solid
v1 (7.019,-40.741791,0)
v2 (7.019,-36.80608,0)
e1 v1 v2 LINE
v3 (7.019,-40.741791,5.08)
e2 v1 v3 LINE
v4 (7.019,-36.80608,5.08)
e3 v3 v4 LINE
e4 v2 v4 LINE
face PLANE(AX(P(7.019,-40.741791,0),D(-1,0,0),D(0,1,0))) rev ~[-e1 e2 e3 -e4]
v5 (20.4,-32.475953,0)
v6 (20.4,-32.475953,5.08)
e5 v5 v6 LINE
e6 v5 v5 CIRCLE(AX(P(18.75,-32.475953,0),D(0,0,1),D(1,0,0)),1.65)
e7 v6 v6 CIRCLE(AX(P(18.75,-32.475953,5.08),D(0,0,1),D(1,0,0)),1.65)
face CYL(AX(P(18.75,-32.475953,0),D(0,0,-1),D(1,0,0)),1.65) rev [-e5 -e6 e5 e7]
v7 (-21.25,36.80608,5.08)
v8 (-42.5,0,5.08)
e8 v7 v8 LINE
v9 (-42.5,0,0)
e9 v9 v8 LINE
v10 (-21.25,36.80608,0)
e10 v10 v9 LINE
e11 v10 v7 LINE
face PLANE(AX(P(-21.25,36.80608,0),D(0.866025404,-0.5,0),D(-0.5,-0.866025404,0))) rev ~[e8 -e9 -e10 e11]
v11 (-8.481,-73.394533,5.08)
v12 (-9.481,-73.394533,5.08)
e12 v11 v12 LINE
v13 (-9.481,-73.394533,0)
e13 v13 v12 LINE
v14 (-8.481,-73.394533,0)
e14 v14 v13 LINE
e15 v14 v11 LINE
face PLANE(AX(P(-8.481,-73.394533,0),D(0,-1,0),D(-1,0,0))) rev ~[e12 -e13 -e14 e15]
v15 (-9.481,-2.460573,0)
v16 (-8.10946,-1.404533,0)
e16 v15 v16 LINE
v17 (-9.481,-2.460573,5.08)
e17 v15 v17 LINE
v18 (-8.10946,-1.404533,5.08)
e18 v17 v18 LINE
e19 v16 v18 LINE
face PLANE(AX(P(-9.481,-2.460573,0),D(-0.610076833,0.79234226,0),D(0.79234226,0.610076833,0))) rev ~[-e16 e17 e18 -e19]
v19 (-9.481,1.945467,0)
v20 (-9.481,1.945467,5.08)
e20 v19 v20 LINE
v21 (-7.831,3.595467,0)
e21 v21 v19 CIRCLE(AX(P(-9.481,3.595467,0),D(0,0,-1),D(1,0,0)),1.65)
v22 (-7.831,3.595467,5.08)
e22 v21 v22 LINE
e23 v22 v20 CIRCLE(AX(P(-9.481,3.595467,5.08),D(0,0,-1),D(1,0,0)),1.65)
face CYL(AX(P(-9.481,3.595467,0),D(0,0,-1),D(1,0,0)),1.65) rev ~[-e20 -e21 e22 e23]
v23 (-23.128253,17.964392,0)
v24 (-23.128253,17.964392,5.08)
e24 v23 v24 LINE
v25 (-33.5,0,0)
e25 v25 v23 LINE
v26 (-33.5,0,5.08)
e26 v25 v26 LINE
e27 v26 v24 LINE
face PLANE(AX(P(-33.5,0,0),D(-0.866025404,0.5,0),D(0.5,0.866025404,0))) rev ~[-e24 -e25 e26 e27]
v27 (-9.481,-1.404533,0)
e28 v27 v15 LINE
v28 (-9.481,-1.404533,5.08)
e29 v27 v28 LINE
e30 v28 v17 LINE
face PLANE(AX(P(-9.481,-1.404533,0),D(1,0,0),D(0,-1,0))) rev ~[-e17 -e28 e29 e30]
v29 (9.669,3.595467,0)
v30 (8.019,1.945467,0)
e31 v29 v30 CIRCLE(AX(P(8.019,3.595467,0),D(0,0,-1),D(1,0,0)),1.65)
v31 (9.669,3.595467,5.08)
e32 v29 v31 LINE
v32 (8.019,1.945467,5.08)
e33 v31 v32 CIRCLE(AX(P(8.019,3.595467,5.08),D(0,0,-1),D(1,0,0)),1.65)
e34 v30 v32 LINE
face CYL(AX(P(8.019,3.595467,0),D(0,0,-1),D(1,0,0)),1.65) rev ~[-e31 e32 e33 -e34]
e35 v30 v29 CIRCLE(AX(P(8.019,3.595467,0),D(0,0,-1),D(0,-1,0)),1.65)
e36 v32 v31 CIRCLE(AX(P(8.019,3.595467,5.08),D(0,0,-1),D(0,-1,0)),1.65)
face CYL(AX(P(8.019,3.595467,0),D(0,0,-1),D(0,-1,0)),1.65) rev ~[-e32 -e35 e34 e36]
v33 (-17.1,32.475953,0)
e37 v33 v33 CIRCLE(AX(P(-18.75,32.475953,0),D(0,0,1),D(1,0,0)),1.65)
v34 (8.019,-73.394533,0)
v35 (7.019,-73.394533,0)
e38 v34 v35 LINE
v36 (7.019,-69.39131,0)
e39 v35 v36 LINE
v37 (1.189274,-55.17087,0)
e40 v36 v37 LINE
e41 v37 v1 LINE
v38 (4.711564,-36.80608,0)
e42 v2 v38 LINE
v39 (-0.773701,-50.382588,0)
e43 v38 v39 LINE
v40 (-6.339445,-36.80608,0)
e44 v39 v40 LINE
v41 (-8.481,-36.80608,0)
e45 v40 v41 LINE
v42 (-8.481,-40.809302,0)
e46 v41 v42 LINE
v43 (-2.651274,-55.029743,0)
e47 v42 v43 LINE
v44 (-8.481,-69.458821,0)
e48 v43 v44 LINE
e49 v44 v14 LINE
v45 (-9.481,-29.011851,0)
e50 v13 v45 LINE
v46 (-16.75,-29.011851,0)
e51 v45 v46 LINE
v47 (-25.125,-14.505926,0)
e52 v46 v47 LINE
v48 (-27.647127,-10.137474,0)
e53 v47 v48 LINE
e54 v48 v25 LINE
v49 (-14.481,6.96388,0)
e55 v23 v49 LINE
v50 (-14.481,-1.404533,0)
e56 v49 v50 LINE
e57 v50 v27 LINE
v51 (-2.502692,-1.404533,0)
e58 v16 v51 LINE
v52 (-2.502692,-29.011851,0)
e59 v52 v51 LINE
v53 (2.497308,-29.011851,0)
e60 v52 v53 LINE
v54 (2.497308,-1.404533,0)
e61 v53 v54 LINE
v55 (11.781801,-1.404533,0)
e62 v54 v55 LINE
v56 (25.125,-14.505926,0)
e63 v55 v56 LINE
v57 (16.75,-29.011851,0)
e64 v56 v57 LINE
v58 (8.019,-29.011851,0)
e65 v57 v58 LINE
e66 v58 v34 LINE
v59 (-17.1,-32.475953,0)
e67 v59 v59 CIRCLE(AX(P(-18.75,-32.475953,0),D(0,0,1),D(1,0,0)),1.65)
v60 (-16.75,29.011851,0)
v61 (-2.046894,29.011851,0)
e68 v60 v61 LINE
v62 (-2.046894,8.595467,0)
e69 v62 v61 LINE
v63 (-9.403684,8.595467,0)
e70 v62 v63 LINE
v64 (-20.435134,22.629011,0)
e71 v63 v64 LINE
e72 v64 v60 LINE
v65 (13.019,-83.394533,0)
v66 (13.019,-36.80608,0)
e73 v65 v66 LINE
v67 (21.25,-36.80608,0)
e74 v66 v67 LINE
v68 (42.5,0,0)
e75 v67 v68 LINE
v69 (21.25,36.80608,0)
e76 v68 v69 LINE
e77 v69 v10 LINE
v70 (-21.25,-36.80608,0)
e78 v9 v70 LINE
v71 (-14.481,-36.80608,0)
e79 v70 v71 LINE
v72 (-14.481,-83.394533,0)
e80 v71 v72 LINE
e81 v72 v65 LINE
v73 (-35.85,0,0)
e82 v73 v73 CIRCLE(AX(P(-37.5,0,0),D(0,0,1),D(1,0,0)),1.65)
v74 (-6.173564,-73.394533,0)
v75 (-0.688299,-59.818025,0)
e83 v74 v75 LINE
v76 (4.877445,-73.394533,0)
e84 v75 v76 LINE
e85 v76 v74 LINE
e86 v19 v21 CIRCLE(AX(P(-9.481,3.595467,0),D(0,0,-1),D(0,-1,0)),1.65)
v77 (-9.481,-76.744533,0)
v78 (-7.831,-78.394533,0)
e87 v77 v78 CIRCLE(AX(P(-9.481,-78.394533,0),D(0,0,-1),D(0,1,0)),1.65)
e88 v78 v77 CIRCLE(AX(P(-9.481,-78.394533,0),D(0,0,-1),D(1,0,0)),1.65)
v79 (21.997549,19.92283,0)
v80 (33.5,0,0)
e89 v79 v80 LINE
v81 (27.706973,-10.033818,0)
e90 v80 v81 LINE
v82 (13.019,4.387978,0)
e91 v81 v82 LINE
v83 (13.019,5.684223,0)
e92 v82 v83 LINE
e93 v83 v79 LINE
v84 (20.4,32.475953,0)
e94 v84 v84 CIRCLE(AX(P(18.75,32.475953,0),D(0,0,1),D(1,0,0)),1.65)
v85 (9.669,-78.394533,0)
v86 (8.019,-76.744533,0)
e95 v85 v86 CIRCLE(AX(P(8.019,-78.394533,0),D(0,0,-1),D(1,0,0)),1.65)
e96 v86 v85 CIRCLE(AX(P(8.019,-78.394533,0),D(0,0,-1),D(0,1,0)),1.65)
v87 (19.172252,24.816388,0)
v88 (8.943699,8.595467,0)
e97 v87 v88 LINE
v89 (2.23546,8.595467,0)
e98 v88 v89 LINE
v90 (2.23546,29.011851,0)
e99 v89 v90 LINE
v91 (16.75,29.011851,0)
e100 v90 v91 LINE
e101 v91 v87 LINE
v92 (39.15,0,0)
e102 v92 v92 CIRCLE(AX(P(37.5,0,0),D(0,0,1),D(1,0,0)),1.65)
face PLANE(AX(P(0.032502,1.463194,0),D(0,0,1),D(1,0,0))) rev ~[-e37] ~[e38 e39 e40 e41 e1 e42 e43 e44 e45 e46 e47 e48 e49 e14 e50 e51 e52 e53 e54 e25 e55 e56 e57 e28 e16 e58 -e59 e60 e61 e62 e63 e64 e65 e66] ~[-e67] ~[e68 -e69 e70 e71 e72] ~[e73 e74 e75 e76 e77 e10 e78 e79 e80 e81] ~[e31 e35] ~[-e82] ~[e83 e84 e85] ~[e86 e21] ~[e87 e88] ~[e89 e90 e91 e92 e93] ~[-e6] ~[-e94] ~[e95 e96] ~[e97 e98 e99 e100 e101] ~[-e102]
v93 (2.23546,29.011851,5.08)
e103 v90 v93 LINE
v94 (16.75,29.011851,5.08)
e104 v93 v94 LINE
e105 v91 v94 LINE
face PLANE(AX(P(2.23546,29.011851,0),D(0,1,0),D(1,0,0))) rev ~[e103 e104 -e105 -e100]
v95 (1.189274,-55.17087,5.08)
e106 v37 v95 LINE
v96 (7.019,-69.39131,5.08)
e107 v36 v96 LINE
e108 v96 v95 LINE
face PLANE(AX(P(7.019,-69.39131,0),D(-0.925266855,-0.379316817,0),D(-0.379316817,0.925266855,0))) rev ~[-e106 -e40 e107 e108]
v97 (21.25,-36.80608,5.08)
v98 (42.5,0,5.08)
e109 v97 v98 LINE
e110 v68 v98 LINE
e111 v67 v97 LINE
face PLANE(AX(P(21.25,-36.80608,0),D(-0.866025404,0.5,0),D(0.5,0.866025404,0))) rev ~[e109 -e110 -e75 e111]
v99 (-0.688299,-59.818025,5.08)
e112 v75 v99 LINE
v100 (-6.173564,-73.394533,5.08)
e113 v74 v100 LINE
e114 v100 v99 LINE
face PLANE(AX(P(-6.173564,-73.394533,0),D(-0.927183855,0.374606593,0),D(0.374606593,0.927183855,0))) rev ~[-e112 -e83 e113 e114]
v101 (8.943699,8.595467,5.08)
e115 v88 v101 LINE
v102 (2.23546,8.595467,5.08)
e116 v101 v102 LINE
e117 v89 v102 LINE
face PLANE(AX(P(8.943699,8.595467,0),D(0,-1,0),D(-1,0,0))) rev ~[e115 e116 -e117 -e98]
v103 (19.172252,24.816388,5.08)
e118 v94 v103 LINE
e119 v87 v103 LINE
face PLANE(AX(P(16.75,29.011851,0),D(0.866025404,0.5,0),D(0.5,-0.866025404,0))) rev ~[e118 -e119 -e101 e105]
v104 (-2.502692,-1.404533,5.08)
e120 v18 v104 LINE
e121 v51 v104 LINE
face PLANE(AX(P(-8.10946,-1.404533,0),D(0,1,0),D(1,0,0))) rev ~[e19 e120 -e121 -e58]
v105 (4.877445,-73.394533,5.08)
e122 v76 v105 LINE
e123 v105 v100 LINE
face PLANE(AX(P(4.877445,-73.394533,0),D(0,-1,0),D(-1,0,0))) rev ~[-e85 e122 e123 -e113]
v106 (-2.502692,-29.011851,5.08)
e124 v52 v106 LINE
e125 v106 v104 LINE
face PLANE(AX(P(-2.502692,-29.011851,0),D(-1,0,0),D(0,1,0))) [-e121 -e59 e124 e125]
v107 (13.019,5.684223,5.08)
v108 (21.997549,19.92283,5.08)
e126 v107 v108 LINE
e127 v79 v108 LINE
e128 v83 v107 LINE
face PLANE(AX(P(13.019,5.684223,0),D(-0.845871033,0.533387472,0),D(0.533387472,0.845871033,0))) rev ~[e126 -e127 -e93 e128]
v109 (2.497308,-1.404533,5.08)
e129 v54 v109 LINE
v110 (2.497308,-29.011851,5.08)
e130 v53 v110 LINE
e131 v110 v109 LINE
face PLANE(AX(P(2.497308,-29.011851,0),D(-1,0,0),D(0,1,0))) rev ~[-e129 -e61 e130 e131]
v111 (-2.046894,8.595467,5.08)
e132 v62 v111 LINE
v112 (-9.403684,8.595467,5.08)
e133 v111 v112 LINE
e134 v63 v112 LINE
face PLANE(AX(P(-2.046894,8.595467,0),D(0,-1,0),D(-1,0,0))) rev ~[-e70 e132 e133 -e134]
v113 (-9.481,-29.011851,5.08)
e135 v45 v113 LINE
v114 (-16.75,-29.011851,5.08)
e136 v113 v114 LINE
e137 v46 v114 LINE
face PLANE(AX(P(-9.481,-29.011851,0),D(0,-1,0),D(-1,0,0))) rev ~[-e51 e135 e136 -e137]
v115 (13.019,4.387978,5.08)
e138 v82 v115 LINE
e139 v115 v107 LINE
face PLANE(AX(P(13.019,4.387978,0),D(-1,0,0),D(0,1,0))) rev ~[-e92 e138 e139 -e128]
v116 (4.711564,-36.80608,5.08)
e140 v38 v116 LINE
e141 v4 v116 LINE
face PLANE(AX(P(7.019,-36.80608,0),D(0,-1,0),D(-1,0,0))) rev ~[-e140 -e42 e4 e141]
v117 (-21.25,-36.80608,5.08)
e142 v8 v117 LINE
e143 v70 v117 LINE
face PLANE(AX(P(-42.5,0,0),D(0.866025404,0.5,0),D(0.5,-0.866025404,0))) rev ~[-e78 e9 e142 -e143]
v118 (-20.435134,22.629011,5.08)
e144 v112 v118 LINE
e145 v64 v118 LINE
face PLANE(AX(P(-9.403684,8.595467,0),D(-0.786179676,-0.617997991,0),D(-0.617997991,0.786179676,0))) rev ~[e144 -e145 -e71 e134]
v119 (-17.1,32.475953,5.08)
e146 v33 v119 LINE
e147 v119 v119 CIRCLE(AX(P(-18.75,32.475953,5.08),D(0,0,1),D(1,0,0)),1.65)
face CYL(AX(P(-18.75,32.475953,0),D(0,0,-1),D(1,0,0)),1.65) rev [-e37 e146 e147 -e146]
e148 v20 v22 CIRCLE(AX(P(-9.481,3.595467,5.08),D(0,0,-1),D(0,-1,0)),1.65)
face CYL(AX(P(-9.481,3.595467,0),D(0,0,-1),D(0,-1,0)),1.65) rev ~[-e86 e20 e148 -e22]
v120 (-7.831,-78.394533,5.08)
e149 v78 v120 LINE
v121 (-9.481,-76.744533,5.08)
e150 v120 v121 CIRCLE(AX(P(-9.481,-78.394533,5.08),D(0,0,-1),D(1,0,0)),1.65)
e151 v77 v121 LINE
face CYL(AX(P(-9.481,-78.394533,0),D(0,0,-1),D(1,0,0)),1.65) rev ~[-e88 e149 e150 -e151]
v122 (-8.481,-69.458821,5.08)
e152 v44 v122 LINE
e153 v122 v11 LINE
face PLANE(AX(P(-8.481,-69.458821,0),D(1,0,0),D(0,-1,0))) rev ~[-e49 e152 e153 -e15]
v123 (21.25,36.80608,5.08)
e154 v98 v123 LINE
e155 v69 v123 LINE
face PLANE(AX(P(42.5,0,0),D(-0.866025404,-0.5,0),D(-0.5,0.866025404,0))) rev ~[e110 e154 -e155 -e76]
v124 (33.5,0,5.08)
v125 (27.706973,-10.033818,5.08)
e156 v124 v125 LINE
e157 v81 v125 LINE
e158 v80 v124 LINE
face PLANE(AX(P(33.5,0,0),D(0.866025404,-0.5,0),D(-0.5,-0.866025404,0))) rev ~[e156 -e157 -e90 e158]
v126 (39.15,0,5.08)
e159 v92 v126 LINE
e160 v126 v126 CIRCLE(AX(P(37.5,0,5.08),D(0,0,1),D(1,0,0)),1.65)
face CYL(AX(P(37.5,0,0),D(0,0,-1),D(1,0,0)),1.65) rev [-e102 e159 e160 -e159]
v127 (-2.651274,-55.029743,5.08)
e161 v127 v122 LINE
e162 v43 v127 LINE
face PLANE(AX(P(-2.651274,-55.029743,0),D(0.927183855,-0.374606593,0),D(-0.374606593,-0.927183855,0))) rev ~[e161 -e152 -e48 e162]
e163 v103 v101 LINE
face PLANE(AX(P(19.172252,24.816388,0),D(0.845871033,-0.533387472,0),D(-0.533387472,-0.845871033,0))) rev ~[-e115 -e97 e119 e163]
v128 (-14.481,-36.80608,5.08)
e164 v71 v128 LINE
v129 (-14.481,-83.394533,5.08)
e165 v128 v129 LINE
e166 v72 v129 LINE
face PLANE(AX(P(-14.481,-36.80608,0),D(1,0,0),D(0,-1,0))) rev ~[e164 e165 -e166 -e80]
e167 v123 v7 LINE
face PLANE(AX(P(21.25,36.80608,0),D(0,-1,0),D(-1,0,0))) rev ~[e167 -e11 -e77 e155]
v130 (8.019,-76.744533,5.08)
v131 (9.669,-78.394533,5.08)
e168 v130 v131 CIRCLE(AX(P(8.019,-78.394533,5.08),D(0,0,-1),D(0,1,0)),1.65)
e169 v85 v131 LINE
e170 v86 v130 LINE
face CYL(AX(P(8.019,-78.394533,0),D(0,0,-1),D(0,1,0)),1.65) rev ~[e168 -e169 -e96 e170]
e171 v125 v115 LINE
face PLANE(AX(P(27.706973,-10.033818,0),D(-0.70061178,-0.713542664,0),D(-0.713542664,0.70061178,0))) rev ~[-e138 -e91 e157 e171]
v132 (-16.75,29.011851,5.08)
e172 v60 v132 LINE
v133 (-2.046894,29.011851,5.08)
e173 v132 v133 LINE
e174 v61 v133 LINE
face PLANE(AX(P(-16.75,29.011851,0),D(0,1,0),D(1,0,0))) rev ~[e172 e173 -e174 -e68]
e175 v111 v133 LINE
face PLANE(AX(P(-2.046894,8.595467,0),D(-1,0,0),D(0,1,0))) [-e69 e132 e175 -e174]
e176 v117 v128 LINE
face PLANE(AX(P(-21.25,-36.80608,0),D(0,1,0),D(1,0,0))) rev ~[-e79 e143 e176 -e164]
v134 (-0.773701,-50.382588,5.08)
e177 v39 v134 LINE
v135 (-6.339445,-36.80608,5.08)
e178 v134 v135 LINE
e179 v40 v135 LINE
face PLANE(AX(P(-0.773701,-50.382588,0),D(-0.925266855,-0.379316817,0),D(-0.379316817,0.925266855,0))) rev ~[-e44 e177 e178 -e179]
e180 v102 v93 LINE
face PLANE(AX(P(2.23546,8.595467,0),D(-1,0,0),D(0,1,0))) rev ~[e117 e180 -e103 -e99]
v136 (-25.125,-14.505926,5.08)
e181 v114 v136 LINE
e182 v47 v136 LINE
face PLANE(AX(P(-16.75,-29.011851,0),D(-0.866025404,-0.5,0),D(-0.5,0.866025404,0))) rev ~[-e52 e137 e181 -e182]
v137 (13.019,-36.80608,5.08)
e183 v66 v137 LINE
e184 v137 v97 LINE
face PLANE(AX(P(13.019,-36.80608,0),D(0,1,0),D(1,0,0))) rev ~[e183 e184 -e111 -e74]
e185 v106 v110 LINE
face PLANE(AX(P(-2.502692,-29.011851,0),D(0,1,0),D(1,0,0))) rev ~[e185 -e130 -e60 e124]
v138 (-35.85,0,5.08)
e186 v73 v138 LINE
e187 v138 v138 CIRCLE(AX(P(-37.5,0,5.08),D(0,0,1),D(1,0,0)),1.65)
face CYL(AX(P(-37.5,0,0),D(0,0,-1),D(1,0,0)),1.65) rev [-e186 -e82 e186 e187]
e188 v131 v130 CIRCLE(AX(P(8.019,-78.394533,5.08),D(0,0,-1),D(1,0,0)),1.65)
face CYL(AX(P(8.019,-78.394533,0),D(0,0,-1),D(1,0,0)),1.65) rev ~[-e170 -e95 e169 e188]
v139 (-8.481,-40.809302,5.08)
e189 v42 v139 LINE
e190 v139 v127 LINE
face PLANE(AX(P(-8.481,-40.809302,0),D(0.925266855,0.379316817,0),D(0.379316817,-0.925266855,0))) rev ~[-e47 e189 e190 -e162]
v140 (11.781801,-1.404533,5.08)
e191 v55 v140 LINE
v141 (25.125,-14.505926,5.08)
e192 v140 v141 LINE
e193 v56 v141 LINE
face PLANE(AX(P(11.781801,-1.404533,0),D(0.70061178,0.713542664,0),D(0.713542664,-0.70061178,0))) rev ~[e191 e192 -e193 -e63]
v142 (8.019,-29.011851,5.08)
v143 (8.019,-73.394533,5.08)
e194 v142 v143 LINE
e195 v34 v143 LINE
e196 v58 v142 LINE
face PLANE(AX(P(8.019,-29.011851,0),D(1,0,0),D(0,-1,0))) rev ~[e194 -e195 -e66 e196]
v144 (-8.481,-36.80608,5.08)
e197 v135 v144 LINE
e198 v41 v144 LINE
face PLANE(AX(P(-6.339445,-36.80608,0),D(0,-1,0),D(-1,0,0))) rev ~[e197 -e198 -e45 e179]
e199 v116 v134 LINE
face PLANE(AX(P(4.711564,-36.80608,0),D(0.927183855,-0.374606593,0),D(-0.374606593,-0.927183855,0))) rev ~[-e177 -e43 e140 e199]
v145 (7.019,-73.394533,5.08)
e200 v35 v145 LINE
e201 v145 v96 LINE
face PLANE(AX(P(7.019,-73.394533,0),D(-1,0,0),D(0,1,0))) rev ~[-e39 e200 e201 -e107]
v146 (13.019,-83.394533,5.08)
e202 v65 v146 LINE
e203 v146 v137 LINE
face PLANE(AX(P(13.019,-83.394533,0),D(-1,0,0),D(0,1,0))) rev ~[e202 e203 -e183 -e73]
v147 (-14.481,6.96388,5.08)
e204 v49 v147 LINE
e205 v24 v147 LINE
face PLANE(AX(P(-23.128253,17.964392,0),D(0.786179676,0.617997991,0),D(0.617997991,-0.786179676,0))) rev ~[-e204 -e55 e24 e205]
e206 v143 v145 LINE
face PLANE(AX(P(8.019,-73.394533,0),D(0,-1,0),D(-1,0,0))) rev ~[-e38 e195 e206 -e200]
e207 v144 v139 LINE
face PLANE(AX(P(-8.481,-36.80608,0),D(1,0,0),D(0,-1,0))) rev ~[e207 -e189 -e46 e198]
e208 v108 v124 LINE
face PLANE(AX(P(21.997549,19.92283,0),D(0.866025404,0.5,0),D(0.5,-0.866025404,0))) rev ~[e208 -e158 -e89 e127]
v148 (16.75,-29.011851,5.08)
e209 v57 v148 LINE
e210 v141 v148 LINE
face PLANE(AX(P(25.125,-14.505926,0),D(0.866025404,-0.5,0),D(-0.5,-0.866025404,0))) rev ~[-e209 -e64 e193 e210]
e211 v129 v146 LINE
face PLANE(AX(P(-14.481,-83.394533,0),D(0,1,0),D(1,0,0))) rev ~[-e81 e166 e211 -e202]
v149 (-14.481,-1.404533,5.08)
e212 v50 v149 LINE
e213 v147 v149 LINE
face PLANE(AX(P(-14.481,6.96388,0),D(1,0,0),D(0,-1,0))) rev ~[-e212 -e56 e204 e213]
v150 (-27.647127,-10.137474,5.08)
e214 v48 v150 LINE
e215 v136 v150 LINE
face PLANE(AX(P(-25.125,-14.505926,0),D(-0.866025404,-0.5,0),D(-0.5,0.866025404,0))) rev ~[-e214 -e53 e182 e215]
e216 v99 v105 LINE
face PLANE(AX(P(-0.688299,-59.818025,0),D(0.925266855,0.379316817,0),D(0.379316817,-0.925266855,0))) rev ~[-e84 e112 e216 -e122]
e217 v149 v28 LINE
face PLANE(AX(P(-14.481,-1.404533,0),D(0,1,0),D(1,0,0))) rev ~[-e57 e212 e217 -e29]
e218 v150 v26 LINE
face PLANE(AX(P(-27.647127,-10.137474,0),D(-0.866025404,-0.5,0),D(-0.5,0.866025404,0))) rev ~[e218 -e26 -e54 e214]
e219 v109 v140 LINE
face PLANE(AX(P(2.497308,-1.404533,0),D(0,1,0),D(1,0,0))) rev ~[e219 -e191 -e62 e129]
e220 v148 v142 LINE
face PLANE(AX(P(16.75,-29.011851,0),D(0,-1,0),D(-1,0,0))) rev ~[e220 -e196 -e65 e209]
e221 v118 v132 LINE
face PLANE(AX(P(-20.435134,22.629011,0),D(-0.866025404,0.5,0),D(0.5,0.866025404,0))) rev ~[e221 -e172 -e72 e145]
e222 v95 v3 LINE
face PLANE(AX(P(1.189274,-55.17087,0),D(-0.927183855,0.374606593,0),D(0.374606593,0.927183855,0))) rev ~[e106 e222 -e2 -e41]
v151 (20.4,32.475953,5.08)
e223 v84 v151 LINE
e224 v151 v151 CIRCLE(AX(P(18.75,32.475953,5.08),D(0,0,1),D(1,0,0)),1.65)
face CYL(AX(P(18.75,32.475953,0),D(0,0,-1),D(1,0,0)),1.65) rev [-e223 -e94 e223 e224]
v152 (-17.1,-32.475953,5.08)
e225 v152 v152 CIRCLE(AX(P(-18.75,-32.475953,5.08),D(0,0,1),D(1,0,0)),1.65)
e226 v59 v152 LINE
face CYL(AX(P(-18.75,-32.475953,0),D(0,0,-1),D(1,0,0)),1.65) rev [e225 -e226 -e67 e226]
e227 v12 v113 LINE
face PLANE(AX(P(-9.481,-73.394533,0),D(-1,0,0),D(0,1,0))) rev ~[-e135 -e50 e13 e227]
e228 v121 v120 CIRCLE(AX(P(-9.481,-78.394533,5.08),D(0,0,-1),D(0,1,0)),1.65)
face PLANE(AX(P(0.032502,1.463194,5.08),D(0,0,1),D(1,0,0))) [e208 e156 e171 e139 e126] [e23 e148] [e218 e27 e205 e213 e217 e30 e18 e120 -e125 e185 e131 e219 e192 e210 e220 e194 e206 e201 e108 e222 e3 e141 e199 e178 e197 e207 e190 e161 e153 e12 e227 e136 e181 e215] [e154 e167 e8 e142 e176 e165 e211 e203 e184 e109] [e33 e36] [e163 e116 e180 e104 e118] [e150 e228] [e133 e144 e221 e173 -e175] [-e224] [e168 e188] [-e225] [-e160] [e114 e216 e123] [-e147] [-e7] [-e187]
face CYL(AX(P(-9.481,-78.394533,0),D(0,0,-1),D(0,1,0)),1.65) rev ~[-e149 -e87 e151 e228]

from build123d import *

# Parameters (mm, degrees)
F0_R     = 1.65
F0_W     = 5
F0_H     = 36.5884533238
F0_H_2   = 27.6073180421
F0_W_2   = 4.2823543772
F0_H_3   = 20.4163840114
F1_DEPTH = 5.08


# Not quite as in the source:
# - a feature names something its author has since deleted; it is built from what else it names


with BuildPart() as f1:
    # F0 (on Top) → F1 (new body)
    with BuildSketch(Plane.XY):
        Polygon((21.25, 36.8060796608), (-21.25, 36.8060796608), (-42.5, 0), (-21.25, -36.8060796608), (-14.481, -36.8060796608), (-9.481, -36.8060796608), (-9.481, -29.0118510268), (-16.75, -29.0118510268), (-25.125, -14.5059255134), (-27.6471267629, -10.137473817), (-33.5, 0), (-23.128253194, 17.9643924312), (-20.4351344929, 22.6290108523), (-16.75, 29.0118510268), (-2.0468940441, 29.0118510268), (2.2354603331, 29.0118510268), (16.75, 29.0118510268), (19.1722516141, 24.8163881624), (21.9975489559, 19.92282962), (33.5, 0), (27.7069725582, -10.0338178588), (25.125, -14.5059255134), (16.75, -29.0118510268), (8.019, -29.0118510268), (8.019, -36.8060796608), (13.019, -36.8060796608), (21.25, -36.8060796608), (42.5, 0), align=None)
        with Locations((-18.75, -32.4759526419)):
            Circle(F0_R, mode=Mode.SUBTRACT)
        with Locations((18.75, -32.4759526419)):
            Circle(F0_R, mode=Mode.SUBTRACT)
        with Locations((-37.5, 0)):
            Circle(F0_R, mode=Mode.SUBTRACT)
        with Locations((-18.75, 32.4759526419)):
            Circle(F0_R, mode=Mode.SUBTRACT)
        with Locations((37.5, 0)):
            Circle(F0_R, mode=Mode.SUBTRACT)
        with Locations((18.75, 32.4759526419)):
            Circle(F0_R, mode=Mode.SUBTRACT)
        with Locations((-11.981, -55.1003063227)):
            Rectangle(F0_W, F0_H)
        with Locations((10.519, -55.1003063227)):
            Rectangle(F0_W, F0_H)
        Polygon((-9.481, -73.3945329846), (-14.481, -73.3945329846), (-14.481, -83.3945329846), (13.019, -83.3945329846), (13.019, -73.3945329846), (8.019, -73.3945329846), (7.019, -73.3945329846), (4.8774445356, -73.3945329846), (-6.1735640291, -73.3945329846), (-8.481, -73.3945329846), align=None)
        with BuildLine():
            ThreePointArc((-7.831, -78.3945329846), (-10.647726189, -79.5612591736), (-9.481, -76.7445329846))
            ThreePointArc((-9.481, -76.7445329846), (-8.314273811, -77.2278067957), (-7.831, -78.3945329846))
        make_face(mode=Mode.SUBTRACT)
        with BuildLine():
            ThreePointArc((9.669, -78.3945329846), (6.852273811, -79.5612591736), (8.019, -76.7445329846))
            ThreePointArc((8.019, -76.7445329846), (9.185726189, -77.2278067957), (9.669, -78.3945329846))
        make_face(mode=Mode.SUBTRACT)
        Polygon((-6.3394445356, -36.8060796608), (-8.481, -36.8060796608), (-8.481, -40.8093024077), (-2.6512739295, -55.0297430961), (-0.7737012417, -50.3825876202), align=None)
        Polygon((7.019, -40.7417911932), (7.019, -36.8060796608), (4.7115640291, -36.8060796608), (-0.7737012417, -50.3825876202), (1.1892739295, -55.1708695493), align=None)
        with Locations((-0.002691932, -15.2081920057)):
            Rectangle(F0_W, F0_H_2)
        Polygon((-9.481, -1.4045329846), (-9.481, -2.4605728254), (-8.1094596477, -1.4045329846), align=None)
        Polygon((-8.481, -69.4588214522), (-8.481, -73.3945329846), (-6.1735640291, -73.3945329846), (-0.6882987583, -59.8180250252), (-2.6512739295, -55.0297430961), align=None)
        Polygon((4.8774445356, -73.3945329846), (7.019, -73.3945329846), (7.019, -69.3913102377), (1.1892739295, -55.1708695493), (-0.6882987583, -59.8180250252), align=None)
        Polygon((2.497308068, -1.4045329846), (8.019, -1.4045329846), (11.781800831, -1.4045329846), (13.019, -1.4045329846), (13.019, 4.3879779564), (13.019, 5.6842228109), (13.019, 8.5954670154), (8.9436992999, 8.5954670154), (2.2354603331, 8.5954670154), (-2.0468940441, 8.5954670154), (-9.4036843662, 8.5954670154), (-14.481, 8.5954670154), (-14.481, 6.9638797721), (-14.481, 0), (-14.481, -1.4045329846), (-9.481, -1.4045329846), (-8.1094596477, -1.4045329846), (-2.502691932, -1.4045329846), align=None)
        with BuildLine():
            ThreePointArc((-7.831, 3.5954670154), (-8.314273811, 2.4287408264), (-9.481, 1.9454670154))
            ThreePointArc((-9.481, 1.9454670154), (-10.647726189, 4.7621932043), (-7.831, 3.5954670154))
        make_face(mode=Mode.SUBTRACT)
        with BuildLine():
            ThreePointArc((9.669, 3.5954670154), (9.185726189, 2.4287408264), (8.019, 1.9454670154))
            ThreePointArc((8.019, 1.9454670154), (6.852273811, 4.7621932043), (9.669, 3.5954670154))
        make_face(mode=Mode.SUBTRACT)
        Polygon((1.1892739295, -55.1708695493), (-0.7737012417, -50.3825876202), (-2.6512739295, -55.0297430961), (-0.6882987583, -59.8180250252), align=None)
        Polygon((11.781800831, -1.4045329846), (25.125, -14.5059255134), (27.7069725582, -10.0338178588), (13.019, 4.3879779564), (13.019, -1.4045329846), align=None)
        Polygon((-20.4351344929, 22.6290108523), (-23.128253194, 17.9643924312), (-14.481, 6.9638797721), (-14.481, 8.5954670154), (-9.4036843662, 8.5954670154), align=None)
        Polygon((13.019, 5.6842228109), (21.9975489559, 19.92282962), (19.1722516141, 24.8163881624), (8.9436992999, 8.5954670154), (13.019, 8.5954670154), align=None)
        with Locations((0.0942831445, 18.8036590211)):
            Rectangle(F0_W_2, F0_H_3)
    extrude(amount=F1_DEPTH)


solid = f1.part
